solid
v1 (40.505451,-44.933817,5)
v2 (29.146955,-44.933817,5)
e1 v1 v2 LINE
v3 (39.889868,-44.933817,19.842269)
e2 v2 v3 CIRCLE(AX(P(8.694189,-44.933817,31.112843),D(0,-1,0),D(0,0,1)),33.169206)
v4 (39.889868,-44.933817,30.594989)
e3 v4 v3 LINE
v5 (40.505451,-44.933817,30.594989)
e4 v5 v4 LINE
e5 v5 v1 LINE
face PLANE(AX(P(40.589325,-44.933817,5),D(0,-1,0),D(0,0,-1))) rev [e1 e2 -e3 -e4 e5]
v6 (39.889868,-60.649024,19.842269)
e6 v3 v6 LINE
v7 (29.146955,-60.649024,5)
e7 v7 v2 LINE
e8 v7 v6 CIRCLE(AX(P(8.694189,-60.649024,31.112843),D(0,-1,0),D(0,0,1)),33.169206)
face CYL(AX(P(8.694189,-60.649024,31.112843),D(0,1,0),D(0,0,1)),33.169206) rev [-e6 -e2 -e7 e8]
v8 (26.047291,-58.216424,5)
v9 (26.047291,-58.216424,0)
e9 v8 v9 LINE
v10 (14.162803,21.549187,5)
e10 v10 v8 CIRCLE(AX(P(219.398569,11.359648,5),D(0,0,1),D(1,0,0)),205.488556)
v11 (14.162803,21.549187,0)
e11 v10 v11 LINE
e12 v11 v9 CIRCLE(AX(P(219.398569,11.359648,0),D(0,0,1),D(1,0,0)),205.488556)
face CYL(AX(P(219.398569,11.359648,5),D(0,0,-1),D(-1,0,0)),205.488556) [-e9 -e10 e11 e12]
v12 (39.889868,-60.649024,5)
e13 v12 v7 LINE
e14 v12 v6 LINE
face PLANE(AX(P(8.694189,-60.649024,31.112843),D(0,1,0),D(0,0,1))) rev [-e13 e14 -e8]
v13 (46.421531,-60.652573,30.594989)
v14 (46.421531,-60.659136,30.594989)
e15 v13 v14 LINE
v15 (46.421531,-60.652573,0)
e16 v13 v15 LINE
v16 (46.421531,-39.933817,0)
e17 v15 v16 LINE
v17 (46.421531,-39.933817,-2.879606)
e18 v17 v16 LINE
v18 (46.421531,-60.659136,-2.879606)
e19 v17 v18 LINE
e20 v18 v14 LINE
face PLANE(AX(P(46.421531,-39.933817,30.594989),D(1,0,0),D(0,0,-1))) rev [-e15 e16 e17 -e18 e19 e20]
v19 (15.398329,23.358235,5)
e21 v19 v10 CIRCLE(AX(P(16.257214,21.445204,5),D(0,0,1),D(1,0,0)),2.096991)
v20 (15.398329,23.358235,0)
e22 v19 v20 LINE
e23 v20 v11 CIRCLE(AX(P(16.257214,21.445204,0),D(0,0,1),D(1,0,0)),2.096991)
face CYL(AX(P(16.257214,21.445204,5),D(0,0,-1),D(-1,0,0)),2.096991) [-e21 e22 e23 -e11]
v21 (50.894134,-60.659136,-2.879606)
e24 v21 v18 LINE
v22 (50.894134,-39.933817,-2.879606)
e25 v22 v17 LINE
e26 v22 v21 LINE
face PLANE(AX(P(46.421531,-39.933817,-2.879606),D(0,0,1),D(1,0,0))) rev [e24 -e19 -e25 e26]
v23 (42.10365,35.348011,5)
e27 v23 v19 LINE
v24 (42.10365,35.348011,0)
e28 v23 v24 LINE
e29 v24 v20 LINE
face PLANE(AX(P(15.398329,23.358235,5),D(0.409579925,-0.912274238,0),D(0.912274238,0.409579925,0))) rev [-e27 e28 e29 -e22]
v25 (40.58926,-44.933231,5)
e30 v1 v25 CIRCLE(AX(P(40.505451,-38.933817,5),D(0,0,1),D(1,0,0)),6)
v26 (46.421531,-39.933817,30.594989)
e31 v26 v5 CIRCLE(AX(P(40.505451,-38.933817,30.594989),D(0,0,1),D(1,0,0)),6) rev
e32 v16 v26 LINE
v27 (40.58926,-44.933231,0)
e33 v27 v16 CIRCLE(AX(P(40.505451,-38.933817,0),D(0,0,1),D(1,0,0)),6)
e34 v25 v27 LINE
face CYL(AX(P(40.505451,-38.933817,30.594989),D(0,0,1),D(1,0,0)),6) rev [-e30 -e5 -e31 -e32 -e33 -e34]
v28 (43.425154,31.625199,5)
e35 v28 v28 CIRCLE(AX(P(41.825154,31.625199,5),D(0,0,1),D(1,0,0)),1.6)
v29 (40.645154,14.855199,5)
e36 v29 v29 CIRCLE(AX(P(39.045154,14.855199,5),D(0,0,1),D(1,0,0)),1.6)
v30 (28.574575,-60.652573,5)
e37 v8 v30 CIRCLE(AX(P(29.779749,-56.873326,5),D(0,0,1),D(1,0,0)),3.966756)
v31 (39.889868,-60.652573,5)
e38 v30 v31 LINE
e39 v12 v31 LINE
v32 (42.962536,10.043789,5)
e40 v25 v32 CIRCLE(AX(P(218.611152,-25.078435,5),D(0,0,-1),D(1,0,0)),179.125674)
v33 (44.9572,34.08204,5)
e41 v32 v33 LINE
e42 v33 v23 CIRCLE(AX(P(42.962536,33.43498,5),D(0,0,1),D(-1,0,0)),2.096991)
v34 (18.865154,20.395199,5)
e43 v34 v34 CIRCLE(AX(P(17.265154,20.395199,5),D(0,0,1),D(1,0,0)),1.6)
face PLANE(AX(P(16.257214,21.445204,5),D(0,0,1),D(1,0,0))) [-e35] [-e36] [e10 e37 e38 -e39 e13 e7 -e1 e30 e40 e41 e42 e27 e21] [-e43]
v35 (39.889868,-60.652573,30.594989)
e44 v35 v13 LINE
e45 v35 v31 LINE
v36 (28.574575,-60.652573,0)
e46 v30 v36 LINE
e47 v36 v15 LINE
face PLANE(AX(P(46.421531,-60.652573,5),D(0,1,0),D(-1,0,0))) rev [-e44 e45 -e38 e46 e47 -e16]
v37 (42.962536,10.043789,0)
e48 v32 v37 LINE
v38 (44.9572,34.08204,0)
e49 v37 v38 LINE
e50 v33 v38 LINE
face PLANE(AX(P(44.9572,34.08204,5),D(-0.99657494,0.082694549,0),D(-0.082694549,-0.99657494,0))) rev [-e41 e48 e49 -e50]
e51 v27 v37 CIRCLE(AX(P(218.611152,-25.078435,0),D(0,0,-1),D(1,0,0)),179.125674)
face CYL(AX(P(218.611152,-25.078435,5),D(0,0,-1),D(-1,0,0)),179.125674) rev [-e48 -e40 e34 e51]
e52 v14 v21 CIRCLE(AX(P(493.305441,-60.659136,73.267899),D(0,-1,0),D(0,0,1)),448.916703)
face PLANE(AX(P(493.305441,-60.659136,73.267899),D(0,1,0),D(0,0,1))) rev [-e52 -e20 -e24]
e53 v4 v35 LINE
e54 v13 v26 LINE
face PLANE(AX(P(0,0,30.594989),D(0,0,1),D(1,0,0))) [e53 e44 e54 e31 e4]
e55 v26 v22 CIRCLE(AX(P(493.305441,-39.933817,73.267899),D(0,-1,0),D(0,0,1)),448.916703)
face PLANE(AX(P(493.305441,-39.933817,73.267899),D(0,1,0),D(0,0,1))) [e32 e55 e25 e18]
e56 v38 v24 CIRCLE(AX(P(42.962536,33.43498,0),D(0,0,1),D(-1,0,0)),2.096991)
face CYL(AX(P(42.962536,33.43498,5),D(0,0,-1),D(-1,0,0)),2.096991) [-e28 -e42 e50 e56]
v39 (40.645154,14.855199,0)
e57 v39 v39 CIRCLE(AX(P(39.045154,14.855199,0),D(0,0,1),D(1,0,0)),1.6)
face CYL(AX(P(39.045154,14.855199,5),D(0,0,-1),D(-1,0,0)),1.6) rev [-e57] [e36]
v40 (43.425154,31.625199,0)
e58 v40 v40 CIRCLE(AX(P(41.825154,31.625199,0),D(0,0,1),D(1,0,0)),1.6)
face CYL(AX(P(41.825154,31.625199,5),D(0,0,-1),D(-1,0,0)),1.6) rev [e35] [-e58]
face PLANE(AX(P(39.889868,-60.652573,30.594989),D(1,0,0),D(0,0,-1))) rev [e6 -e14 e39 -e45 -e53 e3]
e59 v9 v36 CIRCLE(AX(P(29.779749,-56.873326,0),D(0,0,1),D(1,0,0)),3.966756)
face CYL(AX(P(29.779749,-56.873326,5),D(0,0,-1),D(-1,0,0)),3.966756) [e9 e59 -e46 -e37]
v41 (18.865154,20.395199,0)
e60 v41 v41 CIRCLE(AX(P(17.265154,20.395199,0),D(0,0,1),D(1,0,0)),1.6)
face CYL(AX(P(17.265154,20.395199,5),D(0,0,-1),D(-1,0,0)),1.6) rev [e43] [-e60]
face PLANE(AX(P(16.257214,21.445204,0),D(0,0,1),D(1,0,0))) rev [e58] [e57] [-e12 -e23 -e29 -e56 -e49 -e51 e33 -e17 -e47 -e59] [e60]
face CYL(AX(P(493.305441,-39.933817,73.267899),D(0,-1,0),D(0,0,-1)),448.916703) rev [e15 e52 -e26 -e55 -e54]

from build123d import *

# Parameters (mm, degrees)
SKETCH3_R                = 1.6
BOSS_EXTRUDE2_DEPTH      = 5
SKETCH8_W                = 6.531662429
SKETCH8_H                = 15.718756423
BOSS_EXTRUDE5_DEPTH      = 25.594989388
BOSS_EXTRUDE6_DEPTH      = 5
BOSS_EXTRUDE6_DEPTH_BACK = 15.725319597
BOSS_EXTRUDE7_DEPTH      = 15.715206985
FILLET3_R                = 6


with BuildPart() as part:
    # Sketch3 → Boss-Extrude2 (new body)
    with BuildSketch(Plane.XY):
        with BuildLine():
            Line((15.398328751, 23.358235096), (42.103650237, 35.3480109))
            ThreePointArc((42.103650237, 35.3480109), (43.812929052, 35.351800988), (44.957199874, 34.082040099))
            Line((44.957199874, 34.082040099), (42.962535727, 10.043789437))
            ThreePointArc((42.962535727, 10.043789437), (39.652134692, -17.353336053), (40.589325164, -44.933816726))
            Line((40.589325164, -44.933816726), (46.4215305, -44.933816726))
            Line((46.4215305, -44.933816726), (46.4215305, -60.652573149))
            Line((46.4215305, -60.652573149), (28.574574678, -60.652573149))
            ThreePointArc((28.574574678, -60.652573149), (27.026794649, -59.729266605), (26.047291344, -58.216424488))
            ThreePointArc((26.047291344, -58.216424488), (16.153529465, -18.922365583), (14.162802755, 21.549187347))
            ThreePointArc((14.162802755, 21.549187347), (14.525551977, 22.627878073), (15.398328751, 23.358235096))
        make_face()
        with Locations((17.26515434, 20.395199458)):
            Circle(SKETCH3_R, mode=Mode.SUBTRACT)
        with Locations((41.82515434, 31.625199458)):
            Circle(SKETCH3_R, mode=Mode.SUBTRACT)
        with Locations((39.04515434, 14.855199458)):
            Circle(SKETCH3_R, mode=Mode.SUBTRACT)
    extrude(amount=BOSS_EXTRUDE2_DEPTH)

    # Sketch8 → Boss-Extrude5 (add)
    with BuildSketch(Plane.XY.offset(5)):
        with Locations((43.155699286, -52.793194938)):
            Rectangle(SKETCH8_W, SKETCH8_H)
    extrude(amount=BOSS_EXTRUDE5_DEPTH)

    # Sketch9 → Boss-Extrude6 (add, two sides: drawn at the far end of the back side and taken through both)
    with BuildSketch(Plane(origin=(0, -44.933816726, 0), x_dir=(1, 0, 0), z_dir=(0, 1, 0)).offset(-BOSS_EXTRUDE6_DEPTH_BACK)):
        with BuildLine():
            Line((46.4215305, -30.594989388), (46.4215305, 0))
            Line((46.4215305, 0), (46.4215305, 2.879605598))
            Line((46.4215305, 2.879605598), (50.894134372, 2.879605598))
            ThreePointArc((50.894134372, 2.879605598), (48.34293367, -13.815617676), (46.4215305, -30.594989388))
        make_face()
    extrude(amount=BOSS_EXTRUDE6_DEPTH + BOSS_EXTRUDE6_DEPTH_BACK)

    # Sketch10 → Boss-Extrude7 (add)
    with BuildSketch(Plane(origin=(0, -44.933816726, 0), x_dir=(1, 0, 0), z_dir=(0, 1, 0))):
        with BuildLine():
            Line((29.146955031, -5), (41.859352304, -5))
            Line((41.859352304, -5), (41.859352304, -30.594989388))
            ThreePointArc((41.859352304, -30.594989388), (38.401030969, -16.358190815), (29.146955031, -5))
        make_face()
    extrude(amount=-BOSS_EXTRUDE7_DEPTH)

    # Fillet3
    # the kernel refuses this fillet: 6 mm, written as the material it adds along each edge
    with BuildSketch(Plane(origin=(46.4215305, -44.933816726, 30.594989388), x_dir=(0, 1, 0), z_dir=(0, 0, -1))) as fillet3_piece_1_section:
        with BuildLine():
            CenterArc((6, -5.916079783), FILLET3_R, 99.594068227, 80.405931773)
            Line((0, -5.916079783), (-0.12, -5.916079783))
            Line((-0.12, -5.916079783), (-0.12, 0))
            Line((-0.12, 0), (0, 0.12))
            ThreePointArc((0, 0.12), (2.5, 0.12), (4.98, 0.118321596))
            Line((4.98, 0.118321596), (5, 0))
        make_face()
    fillet3_piece_1 = extrude(amount=30.594989388, mode=Mode.PRIVATE)
    fillet3_piece_1 = fillet3_piece_1 - Plane(origin=(493.305440786, -43.701646152, 73.26789881), x_dir=(-0.9855086772136745, 0, -0.16962501919396705), z_dir=(0, -1, 0)) * Cylinder(448.916703265, 85, mode=Mode.PRIVATE)
    add(fillet3_piece_1)


solid = part.part
